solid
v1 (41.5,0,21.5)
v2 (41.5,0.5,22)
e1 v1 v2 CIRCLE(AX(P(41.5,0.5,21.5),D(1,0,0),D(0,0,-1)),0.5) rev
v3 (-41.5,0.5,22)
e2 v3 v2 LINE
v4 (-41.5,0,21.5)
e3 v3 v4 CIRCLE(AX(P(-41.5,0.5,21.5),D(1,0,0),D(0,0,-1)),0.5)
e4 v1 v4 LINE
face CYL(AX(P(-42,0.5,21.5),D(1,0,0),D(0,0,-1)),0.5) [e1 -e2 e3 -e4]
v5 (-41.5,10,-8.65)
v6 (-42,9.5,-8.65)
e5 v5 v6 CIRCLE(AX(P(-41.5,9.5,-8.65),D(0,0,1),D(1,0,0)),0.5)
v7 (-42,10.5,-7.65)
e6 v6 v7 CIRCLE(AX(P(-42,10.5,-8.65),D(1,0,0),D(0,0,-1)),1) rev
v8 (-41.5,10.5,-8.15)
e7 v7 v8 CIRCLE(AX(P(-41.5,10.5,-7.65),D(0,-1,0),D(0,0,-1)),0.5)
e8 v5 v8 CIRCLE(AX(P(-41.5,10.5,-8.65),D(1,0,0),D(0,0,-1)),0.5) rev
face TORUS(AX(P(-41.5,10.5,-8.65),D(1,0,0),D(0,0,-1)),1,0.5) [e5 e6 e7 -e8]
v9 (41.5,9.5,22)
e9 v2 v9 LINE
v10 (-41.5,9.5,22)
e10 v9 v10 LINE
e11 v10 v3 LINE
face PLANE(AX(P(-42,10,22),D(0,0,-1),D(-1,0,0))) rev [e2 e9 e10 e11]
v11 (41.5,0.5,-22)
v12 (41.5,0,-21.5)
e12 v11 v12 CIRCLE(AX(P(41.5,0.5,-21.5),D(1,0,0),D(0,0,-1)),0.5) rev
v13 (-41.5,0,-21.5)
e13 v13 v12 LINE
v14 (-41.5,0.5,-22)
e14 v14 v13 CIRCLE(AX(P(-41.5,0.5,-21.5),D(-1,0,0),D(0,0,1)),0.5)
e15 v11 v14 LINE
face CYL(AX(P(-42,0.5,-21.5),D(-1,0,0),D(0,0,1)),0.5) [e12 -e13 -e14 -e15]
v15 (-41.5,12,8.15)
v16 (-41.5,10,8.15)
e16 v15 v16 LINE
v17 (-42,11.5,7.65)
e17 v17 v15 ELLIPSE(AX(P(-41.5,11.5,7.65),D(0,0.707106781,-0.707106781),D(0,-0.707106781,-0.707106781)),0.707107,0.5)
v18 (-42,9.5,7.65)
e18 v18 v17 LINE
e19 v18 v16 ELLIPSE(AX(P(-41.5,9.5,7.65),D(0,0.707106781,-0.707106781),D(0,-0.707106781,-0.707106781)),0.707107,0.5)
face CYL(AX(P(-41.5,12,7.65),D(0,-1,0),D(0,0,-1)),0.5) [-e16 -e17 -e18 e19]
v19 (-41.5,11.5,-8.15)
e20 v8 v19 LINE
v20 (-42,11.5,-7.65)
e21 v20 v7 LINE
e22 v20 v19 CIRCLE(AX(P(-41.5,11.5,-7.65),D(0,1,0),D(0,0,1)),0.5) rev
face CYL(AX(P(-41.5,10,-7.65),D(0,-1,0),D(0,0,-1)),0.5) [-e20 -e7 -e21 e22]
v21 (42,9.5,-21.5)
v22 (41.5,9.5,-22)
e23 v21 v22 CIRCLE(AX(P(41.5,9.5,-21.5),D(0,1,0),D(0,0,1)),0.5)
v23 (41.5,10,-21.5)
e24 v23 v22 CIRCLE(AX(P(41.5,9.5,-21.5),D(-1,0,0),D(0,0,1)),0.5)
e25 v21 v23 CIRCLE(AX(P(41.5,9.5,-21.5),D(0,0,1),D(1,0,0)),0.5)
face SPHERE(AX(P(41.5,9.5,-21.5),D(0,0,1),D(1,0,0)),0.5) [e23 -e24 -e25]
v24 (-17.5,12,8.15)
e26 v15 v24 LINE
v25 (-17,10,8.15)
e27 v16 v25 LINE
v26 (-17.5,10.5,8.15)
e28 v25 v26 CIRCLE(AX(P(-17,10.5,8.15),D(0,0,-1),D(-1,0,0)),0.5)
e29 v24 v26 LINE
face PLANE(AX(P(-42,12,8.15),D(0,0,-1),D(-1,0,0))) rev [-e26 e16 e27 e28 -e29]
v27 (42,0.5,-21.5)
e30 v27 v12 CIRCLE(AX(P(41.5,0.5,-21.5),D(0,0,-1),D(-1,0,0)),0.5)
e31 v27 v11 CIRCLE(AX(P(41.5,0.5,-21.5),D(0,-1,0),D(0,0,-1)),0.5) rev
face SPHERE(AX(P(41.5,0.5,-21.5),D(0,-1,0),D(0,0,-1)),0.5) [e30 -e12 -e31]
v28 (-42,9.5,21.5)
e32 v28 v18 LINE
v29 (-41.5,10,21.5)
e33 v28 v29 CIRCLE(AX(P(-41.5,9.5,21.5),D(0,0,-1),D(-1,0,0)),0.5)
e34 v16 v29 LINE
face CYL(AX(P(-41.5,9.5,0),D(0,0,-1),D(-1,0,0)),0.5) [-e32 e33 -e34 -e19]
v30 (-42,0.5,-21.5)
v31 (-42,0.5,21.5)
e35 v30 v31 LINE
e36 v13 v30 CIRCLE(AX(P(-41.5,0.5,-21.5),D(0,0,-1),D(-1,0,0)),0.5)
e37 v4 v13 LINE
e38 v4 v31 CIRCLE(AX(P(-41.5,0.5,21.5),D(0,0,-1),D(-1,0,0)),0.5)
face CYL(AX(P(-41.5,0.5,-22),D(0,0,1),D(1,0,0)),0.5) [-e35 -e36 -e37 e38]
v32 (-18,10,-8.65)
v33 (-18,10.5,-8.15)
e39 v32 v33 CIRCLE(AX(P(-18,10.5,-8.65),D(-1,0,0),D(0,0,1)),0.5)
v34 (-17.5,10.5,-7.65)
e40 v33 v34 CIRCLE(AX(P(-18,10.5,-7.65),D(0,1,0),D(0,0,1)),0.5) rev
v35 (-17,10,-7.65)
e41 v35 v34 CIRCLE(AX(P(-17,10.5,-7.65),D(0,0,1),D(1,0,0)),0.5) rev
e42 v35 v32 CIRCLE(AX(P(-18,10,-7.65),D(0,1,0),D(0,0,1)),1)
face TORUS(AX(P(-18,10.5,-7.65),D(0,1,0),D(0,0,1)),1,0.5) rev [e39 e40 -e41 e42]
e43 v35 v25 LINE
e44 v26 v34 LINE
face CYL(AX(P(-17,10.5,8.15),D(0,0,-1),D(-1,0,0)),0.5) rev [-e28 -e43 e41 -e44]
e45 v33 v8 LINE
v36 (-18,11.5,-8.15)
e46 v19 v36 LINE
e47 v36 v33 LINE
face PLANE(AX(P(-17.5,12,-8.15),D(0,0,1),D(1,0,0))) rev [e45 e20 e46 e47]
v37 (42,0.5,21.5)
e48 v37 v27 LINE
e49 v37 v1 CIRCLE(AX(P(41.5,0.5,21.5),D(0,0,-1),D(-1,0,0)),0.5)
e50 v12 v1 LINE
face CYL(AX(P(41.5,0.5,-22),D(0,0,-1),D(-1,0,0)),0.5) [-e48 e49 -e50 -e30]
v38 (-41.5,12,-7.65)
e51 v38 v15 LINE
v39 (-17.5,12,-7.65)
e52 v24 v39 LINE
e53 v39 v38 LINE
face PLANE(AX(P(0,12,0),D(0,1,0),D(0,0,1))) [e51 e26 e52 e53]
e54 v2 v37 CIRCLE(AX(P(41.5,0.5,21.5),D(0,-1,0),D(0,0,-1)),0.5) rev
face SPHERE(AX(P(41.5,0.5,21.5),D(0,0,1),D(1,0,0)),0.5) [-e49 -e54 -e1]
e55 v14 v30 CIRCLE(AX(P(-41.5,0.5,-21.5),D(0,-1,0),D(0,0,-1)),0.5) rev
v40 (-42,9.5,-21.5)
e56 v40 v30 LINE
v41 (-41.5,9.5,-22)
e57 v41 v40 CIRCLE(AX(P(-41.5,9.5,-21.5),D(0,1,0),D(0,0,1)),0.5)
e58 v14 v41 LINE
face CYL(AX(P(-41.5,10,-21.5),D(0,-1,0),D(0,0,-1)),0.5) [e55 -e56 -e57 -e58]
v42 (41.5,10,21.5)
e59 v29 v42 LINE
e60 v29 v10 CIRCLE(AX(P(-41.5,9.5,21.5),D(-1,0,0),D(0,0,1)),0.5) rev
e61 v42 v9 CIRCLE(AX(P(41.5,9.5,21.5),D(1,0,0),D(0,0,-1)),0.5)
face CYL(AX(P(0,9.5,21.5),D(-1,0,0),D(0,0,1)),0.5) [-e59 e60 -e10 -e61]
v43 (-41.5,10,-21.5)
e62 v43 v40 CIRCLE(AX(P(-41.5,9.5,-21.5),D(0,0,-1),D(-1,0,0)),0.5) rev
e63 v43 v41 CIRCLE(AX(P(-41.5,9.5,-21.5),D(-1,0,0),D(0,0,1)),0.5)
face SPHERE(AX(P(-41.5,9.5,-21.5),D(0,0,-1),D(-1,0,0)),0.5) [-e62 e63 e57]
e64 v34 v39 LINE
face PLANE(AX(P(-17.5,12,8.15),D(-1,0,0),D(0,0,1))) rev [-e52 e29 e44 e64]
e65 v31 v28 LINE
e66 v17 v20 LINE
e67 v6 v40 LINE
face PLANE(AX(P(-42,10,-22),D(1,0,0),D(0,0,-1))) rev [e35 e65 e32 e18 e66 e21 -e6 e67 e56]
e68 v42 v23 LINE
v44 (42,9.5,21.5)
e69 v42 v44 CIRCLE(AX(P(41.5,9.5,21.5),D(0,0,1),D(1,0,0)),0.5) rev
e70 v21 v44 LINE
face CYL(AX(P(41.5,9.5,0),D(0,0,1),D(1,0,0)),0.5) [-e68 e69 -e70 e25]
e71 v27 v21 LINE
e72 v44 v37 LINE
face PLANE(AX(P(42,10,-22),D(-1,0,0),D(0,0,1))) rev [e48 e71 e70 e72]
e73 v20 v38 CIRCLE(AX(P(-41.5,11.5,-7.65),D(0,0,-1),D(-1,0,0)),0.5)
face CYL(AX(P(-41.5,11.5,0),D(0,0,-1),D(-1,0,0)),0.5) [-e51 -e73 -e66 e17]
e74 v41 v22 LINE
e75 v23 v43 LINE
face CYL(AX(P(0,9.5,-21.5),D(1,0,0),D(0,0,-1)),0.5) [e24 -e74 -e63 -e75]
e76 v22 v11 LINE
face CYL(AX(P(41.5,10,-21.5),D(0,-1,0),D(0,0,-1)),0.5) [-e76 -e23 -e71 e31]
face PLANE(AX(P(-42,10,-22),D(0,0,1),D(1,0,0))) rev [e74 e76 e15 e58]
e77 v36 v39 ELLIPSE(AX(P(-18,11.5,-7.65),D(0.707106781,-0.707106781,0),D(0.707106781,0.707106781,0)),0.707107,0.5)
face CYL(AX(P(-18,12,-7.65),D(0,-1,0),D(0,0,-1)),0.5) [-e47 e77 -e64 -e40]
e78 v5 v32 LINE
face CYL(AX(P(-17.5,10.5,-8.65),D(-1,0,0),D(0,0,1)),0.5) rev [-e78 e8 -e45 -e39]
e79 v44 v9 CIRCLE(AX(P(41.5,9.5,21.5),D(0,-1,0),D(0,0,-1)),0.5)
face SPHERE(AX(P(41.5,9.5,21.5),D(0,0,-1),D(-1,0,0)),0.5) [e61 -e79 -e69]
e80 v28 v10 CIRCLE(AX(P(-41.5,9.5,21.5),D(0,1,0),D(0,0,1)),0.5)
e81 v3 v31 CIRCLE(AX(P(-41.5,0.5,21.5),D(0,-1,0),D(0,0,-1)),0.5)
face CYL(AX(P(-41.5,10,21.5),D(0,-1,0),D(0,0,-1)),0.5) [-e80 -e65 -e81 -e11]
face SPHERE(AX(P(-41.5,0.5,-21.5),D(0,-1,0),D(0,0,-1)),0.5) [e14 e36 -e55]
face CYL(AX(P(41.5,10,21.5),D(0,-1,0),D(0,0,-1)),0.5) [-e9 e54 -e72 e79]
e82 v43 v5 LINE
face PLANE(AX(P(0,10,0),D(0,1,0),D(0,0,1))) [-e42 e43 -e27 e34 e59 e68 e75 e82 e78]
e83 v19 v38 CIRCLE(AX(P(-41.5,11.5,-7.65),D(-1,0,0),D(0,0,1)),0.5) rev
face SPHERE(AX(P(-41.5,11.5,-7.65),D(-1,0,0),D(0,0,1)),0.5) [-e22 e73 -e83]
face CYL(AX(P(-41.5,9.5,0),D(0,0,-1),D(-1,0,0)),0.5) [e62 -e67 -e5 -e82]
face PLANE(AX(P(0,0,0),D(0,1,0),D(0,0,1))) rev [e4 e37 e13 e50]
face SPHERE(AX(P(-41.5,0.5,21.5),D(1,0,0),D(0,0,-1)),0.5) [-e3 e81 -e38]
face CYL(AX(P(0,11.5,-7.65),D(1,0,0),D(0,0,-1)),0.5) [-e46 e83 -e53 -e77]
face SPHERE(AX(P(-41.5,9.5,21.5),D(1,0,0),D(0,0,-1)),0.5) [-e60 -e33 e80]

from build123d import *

# Parameters (mm, degrees)
SKETCH_1_W      = 84
SKETCH_1_H      = 44
EXTRUDE_1_DEPTH = 10
SKETCH_3_W      = 24.5
SKETCH_3_H      = 16.3
EXTRUDE_2_DEPTH = 2
FILLET_1_R      = 0.5
FILLET_2_R      = 0.5
FILLET_3_R      = 0.5


with BuildPart() as part:
    # 草图1 → 凸台-拉伸1 (new body)
    with BuildSketch(Plane(origin=(0, 0, 0), x_dir=(1, 0, 0), z_dir=(0, 1, 0))):
        Rectangle(SKETCH_1_W, SKETCH_1_H)
    extrude(amount=EXTRUDE_1_DEPTH)

    # 草图3 → 凸台-拉伸2 (add)
    with BuildSketch(Plane(origin=(0, 10, 0), x_dir=(1, 0, 0), z_dir=(0, 1, 0))):
        with Locations((-29.75, 0)):
            Rectangle(SKETCH_3_W, SKETCH_3_H)
    extrude(amount=EXTRUDE_2_DEPTH)

    # 圆角1
    fillet_1_edges = [part.edges().sort_by_distance(p)[0] for p in [
        (42, 10, 0),
    ]]
    fillet(fillet_1_edges, radius=FILLET_1_R)

    # 圆角2
    fillet_2_edges = [part.edges().sort_by_distance(p)[0] for p in [
        (-0.25, 10, 22),
        (42, 4.75, 22),
        (41.853553391, 9.853553391, 22),
        (0, 0, 22),
    ]]
    fillet(fillet_2_edges, radius=FILLET_2_R)

    # 圆角3
    # the kernel refuses this fillet: 0.5 mm, written as the material it takes off along each edge
    with BuildSketch(Plane(origin=(41.5, 0.5, 21.5), x_dir=(0, -1, 0), z_dir=(1, 0, 0))) as fillet_3_piece_1_section:
        Polygon((0, 0), (FILLET_3_R, 0), (FILLET_3_R, -FILLET_3_R), (0, -FILLET_3_R), align=None)
    fillet_3_piece_1 = extrude(amount=FILLET_3_R, mode=Mode.PRIVATE)
    fillet_3_piece_1 = fillet_3_piece_1 - Plane(origin=(41.5, 0.5, 21.5), x_dir=(0, 0.7071067811865475, -0.7071067811865475), z_dir=(1, 0, 0)) * Sphere(FILLET_3_R, mode=Mode.PRIVATE)
    add(fillet_3_piece_1, mode=Mode.SUBTRACT)
    with BuildSketch(Plane(origin=(41.5, 0.5, -21.5), x_dir=(0, 0, -1), z_dir=(1, 0, 0))) as fillet_3_piece_2_section:
        Polygon((0, 0), (FILLET_3_R, 0), (FILLET_3_R, -FILLET_3_R), (0, -FILLET_3_R), align=None)
    fillet_3_piece_2 = extrude(amount=FILLET_3_R, mode=Mode.PRIVATE)
    fillet_3_piece_2 = fillet_3_piece_2 - Plane(origin=(41.5, 0.5, -21.5), x_dir=(0, 0.7071067811865475, 0.7071067811865475), z_dir=(1, 0, 0)) * Sphere(FILLET_3_R, mode=Mode.PRIVATE)
    add(fillet_3_piece_2, mode=Mode.SUBTRACT)
    with BuildSketch(Plane(origin=(-41.5, 0.5, -21.5), x_dir=(0, 0, -1), z_dir=(-1, 0, 0))) as fillet_3_piece_3_section:
        Polygon((0, 0), (FILLET_3_R, 0), (FILLET_3_R, FILLET_3_R), (0, FILLET_3_R), align=None)
    fillet_3_piece_3 = extrude(amount=FILLET_3_R, mode=Mode.PRIVATE)
    fillet_3_piece_3 = fillet_3_piece_3 - Plane(origin=(-41.5, 0.5, -21.5), x_dir=(0, 0.7071067811865475, 0.7071067811865475), z_dir=(-1, 0, 0)) * Sphere(FILLET_3_R, mode=Mode.PRIVATE)
    add(fillet_3_piece_3, mode=Mode.SUBTRACT)
    with BuildSketch(Plane(origin=(-42, 10, 21.5), x_dir=(1, 0, 0), z_dir=(0, 0, -1))) as fillet_3_piece_4:
        with BuildLine():
            CenterArc((FILLET_3_R, FILLET_3_R), FILLET_3_R, 180, 90)
            Line((0, FILLET_3_R), (0, 0))
            Line((0, 0), (FILLET_3_R, 0))
        make_face()
    extrude(amount=13.35, mode=Mode.SUBTRACT)
    with BuildSketch(Plane(origin=(-42, 10, 8.15), x_dir=(0, 0, -1), z_dir=(0, 1, 0))) as fillet_3_piece_5:
        with BuildLine():
            CenterArc((FILLET_3_R, -FILLET_3_R), FILLET_3_R, 90, 90)
            Line((0, -FILLET_3_R), (0, 0))
            Line((0, 0), (FILLET_3_R, 0))
        make_face()
    extrude(amount=3.25, mode=Mode.SUBTRACT)
    with BuildSketch(Plane(origin=(-17.5, 10, -8.15), x_dir=(-1, 0, 0), z_dir=(0, 1, 0))) as fillet_3_piece_6:
        with BuildLine():
            CenterArc((FILLET_3_R, FILLET_3_R), FILLET_3_R, 180, 90)
            Line((0, FILLET_3_R), (0, 0))
            Line((0, 0), (FILLET_3_R, 0))
        make_face()
    extrude(amount=3.25, mode=Mode.SUBTRACT)
    with BuildSketch(Plane(origin=(-42, 12, -9.4), x_dir=(0, -1, 0), z_dir=(0, 0, 1))) as fillet_3_piece_7:
        with BuildLine():
            CenterArc((FILLET_3_R, FILLET_3_R), FILLET_3_R, 180, 90)
            Line((0, FILLET_3_R), (0, 0))
            Line((0, 0), (FILLET_3_R, 0))
        make_face()
    extrude(amount=18.8, mode=Mode.SUBTRACT)
    with BuildSketch(Plane(origin=(-16.25, 12, -8.15), x_dir=(0, -1, 0), z_dir=(-1, 0, 0))) as fillet_3_piece_8:
        with BuildLine():
            CenterArc((FILLET_3_R, FILLET_3_R), FILLET_3_R, 180, 90)
            Line((0, FILLET_3_R), (0, 0))
            Line((0, 0), (FILLET_3_R, 0))
        make_face()
    extrude(amount=27, mode=Mode.SUBTRACT)
    with BuildSketch(Plane(origin=(-43.25, 10, -22), x_dir=(0, -1, 0), z_dir=(1, 0, 0))) as fillet_3_piece_9:
        with BuildLine():
            CenterArc((FILLET_3_R, -FILLET_3_R), FILLET_3_R, 90, 90)
            Line((0, -FILLET_3_R), (0, 0))
            Line((0, 0), (FILLET_3_R, 0))
        make_face()
    extrude(amount=84.75, mode=Mode.SUBTRACT)
    with BuildSketch(Plane(origin=(42, 0.5, -22), x_dir=(0, 0, 1), z_dir=(0, 1, 0))) as fillet_3_piece_10:
        with BuildLine():
            CenterArc((FILLET_3_R, -FILLET_3_R), FILLET_3_R, 90, 90)
            Line((0, -FILLET_3_R), (0, 0))
            Line((0, 0), (FILLET_3_R, 0))
        make_face()
    extrude(amount=9, mode=Mode.SUBTRACT)
    with BuildSketch(Plane(origin=(41.5, 9.5, -22), x_dir=(1, 0, 0), z_dir=(0, -1, 0))) as fillet_3_piece_11:
        with BuildLine():
            CenterArc((0.5 - FILLET_3_R, FILLET_3_R), FILLET_3_R, 270, 90)
            Line((0.5 - FILLET_3_R, 0), (0.5, 0))
            Line((0.5, 0), (0.5, FILLET_3_R))
        make_face()
    revolve(axis=Axis((41.5, 9.5, -22), (0, 0, 1)), revolution_arc=90, mode=Mode.SUBTRACT)
    with BuildSketch(Plane(origin=(42, 0, -21.5), x_dir=(0, 1, 0), z_dir=(0, 0, 1))) as fillet_3_piece_12:
        with BuildLine():
            CenterArc((FILLET_3_R, FILLET_3_R), FILLET_3_R, 180, 90)
            Line((0, FILLET_3_R), (0, 0))
            Line((0, 0), (FILLET_3_R, 0))
        make_face()
    extrude(amount=43, mode=Mode.SUBTRACT)
    with BuildSketch(Plane(origin=(-42, 0.5, 22), x_dir=(1, 0, 0), z_dir=(0, 1, 0))) as fillet_3_piece_13:
        with BuildLine():
            CenterArc((FILLET_3_R, FILLET_3_R), FILLET_3_R, 180, 90)
            Line((0, FILLET_3_R), (0, 0))
            Line((0, 0), (FILLET_3_R, 0))
        make_face()
    extrude(amount=9, mode=Mode.SUBTRACT)
    with BuildSketch(Plane(origin=(-42, 0.5, 21.5), x_dir=(0, -1, 0), z_dir=(0, 0, -1))) as fillet_3_piece_14:
        with BuildLine():
            CenterArc((0.5 - FILLET_3_R, -FILLET_3_R), FILLET_3_R, 0, 90)
            Line((0.5 - FILLET_3_R, 0), (0.5, 0))
            Line((0.5, 0), (0.5, -FILLET_3_R))
        make_face()
    revolve(axis=Axis((-42, 0.5, 21.5), (-1, 0, 0)), revolution_arc=90, mode=Mode.SUBTRACT)
    with BuildSketch(Plane(origin=(-42, 9.5, 21.5), x_dir=(0, 1, 0), z_dir=(0, 0, -1))) as fillet_3_piece_15:
        with BuildLine():
            CenterArc((0.5 - FILLET_3_R, FILLET_3_R), FILLET_3_R, 270, 90)
            Line((0.5, FILLET_3_R), (0.5, 0))
            Line((0.5, 0), (0.5 - FILLET_3_R, 0))
        make_face()
    revolve(axis=Axis((-42, 9.5, 21.5), (1, 0, 0)), revolution_arc=90, mode=Mode.SUBTRACT)
    with BuildSketch(Plane(origin=(-42, 0, 21.5), x_dir=(1, 0, 0), z_dir=(0, 0, -1))) as fillet_3_piece_16:
        with BuildLine():
            CenterArc((FILLET_3_R, -FILLET_3_R), FILLET_3_R, 90, 90)
            Line((0, -FILLET_3_R), (0, 0))
            Line((0, 0), (FILLET_3_R, 0))
        make_face()
    extrude(amount=43, mode=Mode.SUBTRACT)
    with BuildSketch(Plane(origin=(-41.5, 0, -22), x_dir=(0, 1, 0), z_dir=(1, 0, 0))) as fillet_3_piece_17:
        with BuildLine():
            CenterArc((FILLET_3_R, FILLET_3_R), FILLET_3_R, 180, 90)
            Line((0, FILLET_3_R), (0, 0))
            Line((0, 0), (FILLET_3_R, 0))
        make_face()
    extrude(amount=83, mode=Mode.SUBTRACT)
    with BuildSketch(Plane(origin=(-42, 0.5, -22), x_dir=(1, 0, 0), z_dir=(0, 1, 0))) as fillet_3_piece_18:
        with BuildLine():
            CenterArc((FILLET_3_R, -FILLET_3_R), FILLET_3_R, 90, 90)
            Line((0, -FILLET_3_R), (0, 0))
            Line((0, 0), (FILLET_3_R, 0))
        make_face()
    extrude(amount=10.75, mode=Mode.SUBTRACT)
    with BuildSketch(Plane(origin=(-42, 10, 21.5), x_dir=(1, 0, 0), z_dir=(0, 0, -1))) as fillet_3_piece_19a_section:
        with BuildLine():
            CenterArc((FILLET_3_R, FILLET_3_R), FILLET_3_R, 180, 90)
            Line((0, FILLET_3_R), (0, 0))
            Line((0, 0), (FILLET_3_R, 0))
        make_face()
    fillet_3_piece_19a = extrude(amount=14.6, mode=Mode.PRIVATE)
    fillet_3_piece_19a = split(fillet_3_piece_19a, bisect_by=Plane(origin=(-41.886802443, 9.886802443, 8.15), z_dir=(0, 0, -1)), keep=Keep.TOP, mode=Mode.PRIVATE)
    with BuildSketch(Plane(origin=(-42, 8.75, 8.15), x_dir=(0, 0, -1), z_dir=(0, 1, 0))) as fillet_3_piece_19b_section:
        with BuildLine():
            CenterArc((FILLET_3_R, -FILLET_3_R), FILLET_3_R, 90, 90)
            Line((0, -FILLET_3_R), (0, 0))
            Line((0, 0), (FILLET_3_R, 0))
        make_face()
    fillet_3_piece_19b = extrude(amount=4.5, mode=Mode.PRIVATE)
    fillet_3_piece_19b = split(fillet_3_piece_19b, bisect_by=Plane(origin=(-41.886802443, 10, 8.036802443), z_dir=(0, -1, 0)), keep=Keep.TOP, mode=Mode.PRIVATE)
    fillet_3_piece_19 = fillet_3_piece_19a & fillet_3_piece_19b
    add(fillet_3_piece_19, mode=Mode.SUBTRACT)
    # the kernel refuses this fillet: 0.5 mm, written as the material it adds along each edge
    with BuildSketch(Plane(origin=(-17.5, 10, 8.15), x_dir=(0, 1, 0), z_dir=(0, 0, -1))) as fillet_3_2_piece_1:
        with BuildLine():
            CenterArc((FILLET_3_R, FILLET_3_R), FILLET_3_R, 180, 90)
            Line((0, FILLET_3_R), (0, 0))
            Line((0, 0), (FILLET_3_R, 0))
        make_face()
    extrude(amount=15.8)
    with BuildSketch(Plane(origin=(-18, 10, -8.15), x_dir=(0, 1, 0), z_dir=(-1, 0, 0))) as fillet_3_2_piece_2:
        with BuildLine():
            CenterArc((FILLET_3_R, FILLET_3_R), FILLET_3_R, 180, 90)
            Line((0, FILLET_3_R), (0, 0))
            Line((0, 0), (FILLET_3_R, 0))
        make_face()
    extrude(amount=24)
    with BuildSketch(Plane(origin=(-18, 10, -7.65), x_dir=(0, 0, -1), z_dir=(-1, 0, 0))) as fillet_3_2_piece_3:
        with BuildLine():
            CenterArc((0.5 + FILLET_3_R, -FILLET_3_R), FILLET_3_R, 90, 90)
            Line((0.5 + FILLET_3_R, 0), (0.5, 0))
            Line((0.5, 0), (0.5, -FILLET_3_R))
        make_face()
    revolve(axis=Axis((-18, 10, -7.65), (0, -1, 0)), revolution_arc=90)
    # the kernel refuses this fillet: 0.5 mm, written as the material it takes off along each edge
    with BuildSketch(Plane(origin=(-41.5, 11.5, -7.65), x_dir=(-1, 0, 0), z_dir=(0, 0, -1))) as fillet_3_3_piece_1_section:
        Polygon((0, 0), (FILLET_3_R, 0), (FILLET_3_R, FILLET_3_R), (0, FILLET_3_R), align=None)
    fillet_3_3_piece_1 = extrude(amount=FILLET_3_R, mode=Mode.PRIVATE)
    fillet_3_3_piece_1 = fillet_3_3_piece_1 - Plane(origin=(-41.5, 11.5, -7.65), x_dir=(0.7071067811865475, -0.7071067811865475, 0), z_dir=(0, 0, -1)) * Sphere(FILLET_3_R, mode=Mode.PRIVATE)
    add(fillet_3_3_piece_1, mode=Mode.SUBTRACT)
    with BuildSketch(Plane(origin=(-41.5, 9.5, -21.5), x_dir=(0, 1, 0), z_dir=(-1, 0, 0))) as fillet_3_3_piece_2_section:
        Polygon((0, 0), (FILLET_3_R, 0), (FILLET_3_R, FILLET_3_R), (0, FILLET_3_R), align=None)
    fillet_3_3_piece_2 = extrude(amount=FILLET_3_R, mode=Mode.PRIVATE)
    fillet_3_3_piece_2 = fillet_3_3_piece_2 - Plane(origin=(-41.5, 9.5, -21.5), x_dir=(0, -0.7071067811865475, 0.7071067811865475), z_dir=(-1, 0, 0)) * Sphere(FILLET_3_R, mode=Mode.PRIVATE)
    add(fillet_3_3_piece_2, mode=Mode.SUBTRACT)
    with BuildSketch(Plane(origin=(-42, 10, -8.65), x_dir=(0, -1, 0), z_dir=(0, 0, -1))) as fillet_3_3_piece_3:
        with BuildLine():
            CenterArc((FILLET_3_R, -FILLET_3_R), FILLET_3_R, 90, 90)
            Line((0, -FILLET_3_R), (0, 0))
            Line((0, 0), (FILLET_3_R, 0))
        make_face()
    extrude(amount=12.85, mode=Mode.SUBTRACT)
    with BuildSketch(Plane(origin=(-42, 10.5, -8.15), x_dir=(1, 0, 0), z_dir=(0, 1, 0))) as fillet_3_3_piece_4:
        with BuildLine():
            CenterArc((FILLET_3_R, -FILLET_3_R), FILLET_3_R, 90, 90)
            Line((0, -FILLET_3_R), (0, 0))
            Line((0, 0), (FILLET_3_R, 0))
        make_face()
    extrude(amount=1, mode=Mode.SUBTRACT)
    with BuildSketch(Plane(origin=(-42, 10.5, -8.65), x_dir=(0, 0, 1), z_dir=(0, 1, 0))) as fillet_3_3_piece_5:
        with BuildLine():
            CenterArc((0.5 + FILLET_3_R, FILLET_3_R), FILLET_3_R, 180, 90)
            Line((0.5 + FILLET_3_R, 0), (0.5, 0))
            Line((0.5, 0), (0.5, FILLET_3_R))
        make_face()
    revolve(axis=Axis((-42, 10.5, -8.65), (1, 0, 0)), revolution_arc=90, mode=Mode.SUBTRACT)


solid = part.part
